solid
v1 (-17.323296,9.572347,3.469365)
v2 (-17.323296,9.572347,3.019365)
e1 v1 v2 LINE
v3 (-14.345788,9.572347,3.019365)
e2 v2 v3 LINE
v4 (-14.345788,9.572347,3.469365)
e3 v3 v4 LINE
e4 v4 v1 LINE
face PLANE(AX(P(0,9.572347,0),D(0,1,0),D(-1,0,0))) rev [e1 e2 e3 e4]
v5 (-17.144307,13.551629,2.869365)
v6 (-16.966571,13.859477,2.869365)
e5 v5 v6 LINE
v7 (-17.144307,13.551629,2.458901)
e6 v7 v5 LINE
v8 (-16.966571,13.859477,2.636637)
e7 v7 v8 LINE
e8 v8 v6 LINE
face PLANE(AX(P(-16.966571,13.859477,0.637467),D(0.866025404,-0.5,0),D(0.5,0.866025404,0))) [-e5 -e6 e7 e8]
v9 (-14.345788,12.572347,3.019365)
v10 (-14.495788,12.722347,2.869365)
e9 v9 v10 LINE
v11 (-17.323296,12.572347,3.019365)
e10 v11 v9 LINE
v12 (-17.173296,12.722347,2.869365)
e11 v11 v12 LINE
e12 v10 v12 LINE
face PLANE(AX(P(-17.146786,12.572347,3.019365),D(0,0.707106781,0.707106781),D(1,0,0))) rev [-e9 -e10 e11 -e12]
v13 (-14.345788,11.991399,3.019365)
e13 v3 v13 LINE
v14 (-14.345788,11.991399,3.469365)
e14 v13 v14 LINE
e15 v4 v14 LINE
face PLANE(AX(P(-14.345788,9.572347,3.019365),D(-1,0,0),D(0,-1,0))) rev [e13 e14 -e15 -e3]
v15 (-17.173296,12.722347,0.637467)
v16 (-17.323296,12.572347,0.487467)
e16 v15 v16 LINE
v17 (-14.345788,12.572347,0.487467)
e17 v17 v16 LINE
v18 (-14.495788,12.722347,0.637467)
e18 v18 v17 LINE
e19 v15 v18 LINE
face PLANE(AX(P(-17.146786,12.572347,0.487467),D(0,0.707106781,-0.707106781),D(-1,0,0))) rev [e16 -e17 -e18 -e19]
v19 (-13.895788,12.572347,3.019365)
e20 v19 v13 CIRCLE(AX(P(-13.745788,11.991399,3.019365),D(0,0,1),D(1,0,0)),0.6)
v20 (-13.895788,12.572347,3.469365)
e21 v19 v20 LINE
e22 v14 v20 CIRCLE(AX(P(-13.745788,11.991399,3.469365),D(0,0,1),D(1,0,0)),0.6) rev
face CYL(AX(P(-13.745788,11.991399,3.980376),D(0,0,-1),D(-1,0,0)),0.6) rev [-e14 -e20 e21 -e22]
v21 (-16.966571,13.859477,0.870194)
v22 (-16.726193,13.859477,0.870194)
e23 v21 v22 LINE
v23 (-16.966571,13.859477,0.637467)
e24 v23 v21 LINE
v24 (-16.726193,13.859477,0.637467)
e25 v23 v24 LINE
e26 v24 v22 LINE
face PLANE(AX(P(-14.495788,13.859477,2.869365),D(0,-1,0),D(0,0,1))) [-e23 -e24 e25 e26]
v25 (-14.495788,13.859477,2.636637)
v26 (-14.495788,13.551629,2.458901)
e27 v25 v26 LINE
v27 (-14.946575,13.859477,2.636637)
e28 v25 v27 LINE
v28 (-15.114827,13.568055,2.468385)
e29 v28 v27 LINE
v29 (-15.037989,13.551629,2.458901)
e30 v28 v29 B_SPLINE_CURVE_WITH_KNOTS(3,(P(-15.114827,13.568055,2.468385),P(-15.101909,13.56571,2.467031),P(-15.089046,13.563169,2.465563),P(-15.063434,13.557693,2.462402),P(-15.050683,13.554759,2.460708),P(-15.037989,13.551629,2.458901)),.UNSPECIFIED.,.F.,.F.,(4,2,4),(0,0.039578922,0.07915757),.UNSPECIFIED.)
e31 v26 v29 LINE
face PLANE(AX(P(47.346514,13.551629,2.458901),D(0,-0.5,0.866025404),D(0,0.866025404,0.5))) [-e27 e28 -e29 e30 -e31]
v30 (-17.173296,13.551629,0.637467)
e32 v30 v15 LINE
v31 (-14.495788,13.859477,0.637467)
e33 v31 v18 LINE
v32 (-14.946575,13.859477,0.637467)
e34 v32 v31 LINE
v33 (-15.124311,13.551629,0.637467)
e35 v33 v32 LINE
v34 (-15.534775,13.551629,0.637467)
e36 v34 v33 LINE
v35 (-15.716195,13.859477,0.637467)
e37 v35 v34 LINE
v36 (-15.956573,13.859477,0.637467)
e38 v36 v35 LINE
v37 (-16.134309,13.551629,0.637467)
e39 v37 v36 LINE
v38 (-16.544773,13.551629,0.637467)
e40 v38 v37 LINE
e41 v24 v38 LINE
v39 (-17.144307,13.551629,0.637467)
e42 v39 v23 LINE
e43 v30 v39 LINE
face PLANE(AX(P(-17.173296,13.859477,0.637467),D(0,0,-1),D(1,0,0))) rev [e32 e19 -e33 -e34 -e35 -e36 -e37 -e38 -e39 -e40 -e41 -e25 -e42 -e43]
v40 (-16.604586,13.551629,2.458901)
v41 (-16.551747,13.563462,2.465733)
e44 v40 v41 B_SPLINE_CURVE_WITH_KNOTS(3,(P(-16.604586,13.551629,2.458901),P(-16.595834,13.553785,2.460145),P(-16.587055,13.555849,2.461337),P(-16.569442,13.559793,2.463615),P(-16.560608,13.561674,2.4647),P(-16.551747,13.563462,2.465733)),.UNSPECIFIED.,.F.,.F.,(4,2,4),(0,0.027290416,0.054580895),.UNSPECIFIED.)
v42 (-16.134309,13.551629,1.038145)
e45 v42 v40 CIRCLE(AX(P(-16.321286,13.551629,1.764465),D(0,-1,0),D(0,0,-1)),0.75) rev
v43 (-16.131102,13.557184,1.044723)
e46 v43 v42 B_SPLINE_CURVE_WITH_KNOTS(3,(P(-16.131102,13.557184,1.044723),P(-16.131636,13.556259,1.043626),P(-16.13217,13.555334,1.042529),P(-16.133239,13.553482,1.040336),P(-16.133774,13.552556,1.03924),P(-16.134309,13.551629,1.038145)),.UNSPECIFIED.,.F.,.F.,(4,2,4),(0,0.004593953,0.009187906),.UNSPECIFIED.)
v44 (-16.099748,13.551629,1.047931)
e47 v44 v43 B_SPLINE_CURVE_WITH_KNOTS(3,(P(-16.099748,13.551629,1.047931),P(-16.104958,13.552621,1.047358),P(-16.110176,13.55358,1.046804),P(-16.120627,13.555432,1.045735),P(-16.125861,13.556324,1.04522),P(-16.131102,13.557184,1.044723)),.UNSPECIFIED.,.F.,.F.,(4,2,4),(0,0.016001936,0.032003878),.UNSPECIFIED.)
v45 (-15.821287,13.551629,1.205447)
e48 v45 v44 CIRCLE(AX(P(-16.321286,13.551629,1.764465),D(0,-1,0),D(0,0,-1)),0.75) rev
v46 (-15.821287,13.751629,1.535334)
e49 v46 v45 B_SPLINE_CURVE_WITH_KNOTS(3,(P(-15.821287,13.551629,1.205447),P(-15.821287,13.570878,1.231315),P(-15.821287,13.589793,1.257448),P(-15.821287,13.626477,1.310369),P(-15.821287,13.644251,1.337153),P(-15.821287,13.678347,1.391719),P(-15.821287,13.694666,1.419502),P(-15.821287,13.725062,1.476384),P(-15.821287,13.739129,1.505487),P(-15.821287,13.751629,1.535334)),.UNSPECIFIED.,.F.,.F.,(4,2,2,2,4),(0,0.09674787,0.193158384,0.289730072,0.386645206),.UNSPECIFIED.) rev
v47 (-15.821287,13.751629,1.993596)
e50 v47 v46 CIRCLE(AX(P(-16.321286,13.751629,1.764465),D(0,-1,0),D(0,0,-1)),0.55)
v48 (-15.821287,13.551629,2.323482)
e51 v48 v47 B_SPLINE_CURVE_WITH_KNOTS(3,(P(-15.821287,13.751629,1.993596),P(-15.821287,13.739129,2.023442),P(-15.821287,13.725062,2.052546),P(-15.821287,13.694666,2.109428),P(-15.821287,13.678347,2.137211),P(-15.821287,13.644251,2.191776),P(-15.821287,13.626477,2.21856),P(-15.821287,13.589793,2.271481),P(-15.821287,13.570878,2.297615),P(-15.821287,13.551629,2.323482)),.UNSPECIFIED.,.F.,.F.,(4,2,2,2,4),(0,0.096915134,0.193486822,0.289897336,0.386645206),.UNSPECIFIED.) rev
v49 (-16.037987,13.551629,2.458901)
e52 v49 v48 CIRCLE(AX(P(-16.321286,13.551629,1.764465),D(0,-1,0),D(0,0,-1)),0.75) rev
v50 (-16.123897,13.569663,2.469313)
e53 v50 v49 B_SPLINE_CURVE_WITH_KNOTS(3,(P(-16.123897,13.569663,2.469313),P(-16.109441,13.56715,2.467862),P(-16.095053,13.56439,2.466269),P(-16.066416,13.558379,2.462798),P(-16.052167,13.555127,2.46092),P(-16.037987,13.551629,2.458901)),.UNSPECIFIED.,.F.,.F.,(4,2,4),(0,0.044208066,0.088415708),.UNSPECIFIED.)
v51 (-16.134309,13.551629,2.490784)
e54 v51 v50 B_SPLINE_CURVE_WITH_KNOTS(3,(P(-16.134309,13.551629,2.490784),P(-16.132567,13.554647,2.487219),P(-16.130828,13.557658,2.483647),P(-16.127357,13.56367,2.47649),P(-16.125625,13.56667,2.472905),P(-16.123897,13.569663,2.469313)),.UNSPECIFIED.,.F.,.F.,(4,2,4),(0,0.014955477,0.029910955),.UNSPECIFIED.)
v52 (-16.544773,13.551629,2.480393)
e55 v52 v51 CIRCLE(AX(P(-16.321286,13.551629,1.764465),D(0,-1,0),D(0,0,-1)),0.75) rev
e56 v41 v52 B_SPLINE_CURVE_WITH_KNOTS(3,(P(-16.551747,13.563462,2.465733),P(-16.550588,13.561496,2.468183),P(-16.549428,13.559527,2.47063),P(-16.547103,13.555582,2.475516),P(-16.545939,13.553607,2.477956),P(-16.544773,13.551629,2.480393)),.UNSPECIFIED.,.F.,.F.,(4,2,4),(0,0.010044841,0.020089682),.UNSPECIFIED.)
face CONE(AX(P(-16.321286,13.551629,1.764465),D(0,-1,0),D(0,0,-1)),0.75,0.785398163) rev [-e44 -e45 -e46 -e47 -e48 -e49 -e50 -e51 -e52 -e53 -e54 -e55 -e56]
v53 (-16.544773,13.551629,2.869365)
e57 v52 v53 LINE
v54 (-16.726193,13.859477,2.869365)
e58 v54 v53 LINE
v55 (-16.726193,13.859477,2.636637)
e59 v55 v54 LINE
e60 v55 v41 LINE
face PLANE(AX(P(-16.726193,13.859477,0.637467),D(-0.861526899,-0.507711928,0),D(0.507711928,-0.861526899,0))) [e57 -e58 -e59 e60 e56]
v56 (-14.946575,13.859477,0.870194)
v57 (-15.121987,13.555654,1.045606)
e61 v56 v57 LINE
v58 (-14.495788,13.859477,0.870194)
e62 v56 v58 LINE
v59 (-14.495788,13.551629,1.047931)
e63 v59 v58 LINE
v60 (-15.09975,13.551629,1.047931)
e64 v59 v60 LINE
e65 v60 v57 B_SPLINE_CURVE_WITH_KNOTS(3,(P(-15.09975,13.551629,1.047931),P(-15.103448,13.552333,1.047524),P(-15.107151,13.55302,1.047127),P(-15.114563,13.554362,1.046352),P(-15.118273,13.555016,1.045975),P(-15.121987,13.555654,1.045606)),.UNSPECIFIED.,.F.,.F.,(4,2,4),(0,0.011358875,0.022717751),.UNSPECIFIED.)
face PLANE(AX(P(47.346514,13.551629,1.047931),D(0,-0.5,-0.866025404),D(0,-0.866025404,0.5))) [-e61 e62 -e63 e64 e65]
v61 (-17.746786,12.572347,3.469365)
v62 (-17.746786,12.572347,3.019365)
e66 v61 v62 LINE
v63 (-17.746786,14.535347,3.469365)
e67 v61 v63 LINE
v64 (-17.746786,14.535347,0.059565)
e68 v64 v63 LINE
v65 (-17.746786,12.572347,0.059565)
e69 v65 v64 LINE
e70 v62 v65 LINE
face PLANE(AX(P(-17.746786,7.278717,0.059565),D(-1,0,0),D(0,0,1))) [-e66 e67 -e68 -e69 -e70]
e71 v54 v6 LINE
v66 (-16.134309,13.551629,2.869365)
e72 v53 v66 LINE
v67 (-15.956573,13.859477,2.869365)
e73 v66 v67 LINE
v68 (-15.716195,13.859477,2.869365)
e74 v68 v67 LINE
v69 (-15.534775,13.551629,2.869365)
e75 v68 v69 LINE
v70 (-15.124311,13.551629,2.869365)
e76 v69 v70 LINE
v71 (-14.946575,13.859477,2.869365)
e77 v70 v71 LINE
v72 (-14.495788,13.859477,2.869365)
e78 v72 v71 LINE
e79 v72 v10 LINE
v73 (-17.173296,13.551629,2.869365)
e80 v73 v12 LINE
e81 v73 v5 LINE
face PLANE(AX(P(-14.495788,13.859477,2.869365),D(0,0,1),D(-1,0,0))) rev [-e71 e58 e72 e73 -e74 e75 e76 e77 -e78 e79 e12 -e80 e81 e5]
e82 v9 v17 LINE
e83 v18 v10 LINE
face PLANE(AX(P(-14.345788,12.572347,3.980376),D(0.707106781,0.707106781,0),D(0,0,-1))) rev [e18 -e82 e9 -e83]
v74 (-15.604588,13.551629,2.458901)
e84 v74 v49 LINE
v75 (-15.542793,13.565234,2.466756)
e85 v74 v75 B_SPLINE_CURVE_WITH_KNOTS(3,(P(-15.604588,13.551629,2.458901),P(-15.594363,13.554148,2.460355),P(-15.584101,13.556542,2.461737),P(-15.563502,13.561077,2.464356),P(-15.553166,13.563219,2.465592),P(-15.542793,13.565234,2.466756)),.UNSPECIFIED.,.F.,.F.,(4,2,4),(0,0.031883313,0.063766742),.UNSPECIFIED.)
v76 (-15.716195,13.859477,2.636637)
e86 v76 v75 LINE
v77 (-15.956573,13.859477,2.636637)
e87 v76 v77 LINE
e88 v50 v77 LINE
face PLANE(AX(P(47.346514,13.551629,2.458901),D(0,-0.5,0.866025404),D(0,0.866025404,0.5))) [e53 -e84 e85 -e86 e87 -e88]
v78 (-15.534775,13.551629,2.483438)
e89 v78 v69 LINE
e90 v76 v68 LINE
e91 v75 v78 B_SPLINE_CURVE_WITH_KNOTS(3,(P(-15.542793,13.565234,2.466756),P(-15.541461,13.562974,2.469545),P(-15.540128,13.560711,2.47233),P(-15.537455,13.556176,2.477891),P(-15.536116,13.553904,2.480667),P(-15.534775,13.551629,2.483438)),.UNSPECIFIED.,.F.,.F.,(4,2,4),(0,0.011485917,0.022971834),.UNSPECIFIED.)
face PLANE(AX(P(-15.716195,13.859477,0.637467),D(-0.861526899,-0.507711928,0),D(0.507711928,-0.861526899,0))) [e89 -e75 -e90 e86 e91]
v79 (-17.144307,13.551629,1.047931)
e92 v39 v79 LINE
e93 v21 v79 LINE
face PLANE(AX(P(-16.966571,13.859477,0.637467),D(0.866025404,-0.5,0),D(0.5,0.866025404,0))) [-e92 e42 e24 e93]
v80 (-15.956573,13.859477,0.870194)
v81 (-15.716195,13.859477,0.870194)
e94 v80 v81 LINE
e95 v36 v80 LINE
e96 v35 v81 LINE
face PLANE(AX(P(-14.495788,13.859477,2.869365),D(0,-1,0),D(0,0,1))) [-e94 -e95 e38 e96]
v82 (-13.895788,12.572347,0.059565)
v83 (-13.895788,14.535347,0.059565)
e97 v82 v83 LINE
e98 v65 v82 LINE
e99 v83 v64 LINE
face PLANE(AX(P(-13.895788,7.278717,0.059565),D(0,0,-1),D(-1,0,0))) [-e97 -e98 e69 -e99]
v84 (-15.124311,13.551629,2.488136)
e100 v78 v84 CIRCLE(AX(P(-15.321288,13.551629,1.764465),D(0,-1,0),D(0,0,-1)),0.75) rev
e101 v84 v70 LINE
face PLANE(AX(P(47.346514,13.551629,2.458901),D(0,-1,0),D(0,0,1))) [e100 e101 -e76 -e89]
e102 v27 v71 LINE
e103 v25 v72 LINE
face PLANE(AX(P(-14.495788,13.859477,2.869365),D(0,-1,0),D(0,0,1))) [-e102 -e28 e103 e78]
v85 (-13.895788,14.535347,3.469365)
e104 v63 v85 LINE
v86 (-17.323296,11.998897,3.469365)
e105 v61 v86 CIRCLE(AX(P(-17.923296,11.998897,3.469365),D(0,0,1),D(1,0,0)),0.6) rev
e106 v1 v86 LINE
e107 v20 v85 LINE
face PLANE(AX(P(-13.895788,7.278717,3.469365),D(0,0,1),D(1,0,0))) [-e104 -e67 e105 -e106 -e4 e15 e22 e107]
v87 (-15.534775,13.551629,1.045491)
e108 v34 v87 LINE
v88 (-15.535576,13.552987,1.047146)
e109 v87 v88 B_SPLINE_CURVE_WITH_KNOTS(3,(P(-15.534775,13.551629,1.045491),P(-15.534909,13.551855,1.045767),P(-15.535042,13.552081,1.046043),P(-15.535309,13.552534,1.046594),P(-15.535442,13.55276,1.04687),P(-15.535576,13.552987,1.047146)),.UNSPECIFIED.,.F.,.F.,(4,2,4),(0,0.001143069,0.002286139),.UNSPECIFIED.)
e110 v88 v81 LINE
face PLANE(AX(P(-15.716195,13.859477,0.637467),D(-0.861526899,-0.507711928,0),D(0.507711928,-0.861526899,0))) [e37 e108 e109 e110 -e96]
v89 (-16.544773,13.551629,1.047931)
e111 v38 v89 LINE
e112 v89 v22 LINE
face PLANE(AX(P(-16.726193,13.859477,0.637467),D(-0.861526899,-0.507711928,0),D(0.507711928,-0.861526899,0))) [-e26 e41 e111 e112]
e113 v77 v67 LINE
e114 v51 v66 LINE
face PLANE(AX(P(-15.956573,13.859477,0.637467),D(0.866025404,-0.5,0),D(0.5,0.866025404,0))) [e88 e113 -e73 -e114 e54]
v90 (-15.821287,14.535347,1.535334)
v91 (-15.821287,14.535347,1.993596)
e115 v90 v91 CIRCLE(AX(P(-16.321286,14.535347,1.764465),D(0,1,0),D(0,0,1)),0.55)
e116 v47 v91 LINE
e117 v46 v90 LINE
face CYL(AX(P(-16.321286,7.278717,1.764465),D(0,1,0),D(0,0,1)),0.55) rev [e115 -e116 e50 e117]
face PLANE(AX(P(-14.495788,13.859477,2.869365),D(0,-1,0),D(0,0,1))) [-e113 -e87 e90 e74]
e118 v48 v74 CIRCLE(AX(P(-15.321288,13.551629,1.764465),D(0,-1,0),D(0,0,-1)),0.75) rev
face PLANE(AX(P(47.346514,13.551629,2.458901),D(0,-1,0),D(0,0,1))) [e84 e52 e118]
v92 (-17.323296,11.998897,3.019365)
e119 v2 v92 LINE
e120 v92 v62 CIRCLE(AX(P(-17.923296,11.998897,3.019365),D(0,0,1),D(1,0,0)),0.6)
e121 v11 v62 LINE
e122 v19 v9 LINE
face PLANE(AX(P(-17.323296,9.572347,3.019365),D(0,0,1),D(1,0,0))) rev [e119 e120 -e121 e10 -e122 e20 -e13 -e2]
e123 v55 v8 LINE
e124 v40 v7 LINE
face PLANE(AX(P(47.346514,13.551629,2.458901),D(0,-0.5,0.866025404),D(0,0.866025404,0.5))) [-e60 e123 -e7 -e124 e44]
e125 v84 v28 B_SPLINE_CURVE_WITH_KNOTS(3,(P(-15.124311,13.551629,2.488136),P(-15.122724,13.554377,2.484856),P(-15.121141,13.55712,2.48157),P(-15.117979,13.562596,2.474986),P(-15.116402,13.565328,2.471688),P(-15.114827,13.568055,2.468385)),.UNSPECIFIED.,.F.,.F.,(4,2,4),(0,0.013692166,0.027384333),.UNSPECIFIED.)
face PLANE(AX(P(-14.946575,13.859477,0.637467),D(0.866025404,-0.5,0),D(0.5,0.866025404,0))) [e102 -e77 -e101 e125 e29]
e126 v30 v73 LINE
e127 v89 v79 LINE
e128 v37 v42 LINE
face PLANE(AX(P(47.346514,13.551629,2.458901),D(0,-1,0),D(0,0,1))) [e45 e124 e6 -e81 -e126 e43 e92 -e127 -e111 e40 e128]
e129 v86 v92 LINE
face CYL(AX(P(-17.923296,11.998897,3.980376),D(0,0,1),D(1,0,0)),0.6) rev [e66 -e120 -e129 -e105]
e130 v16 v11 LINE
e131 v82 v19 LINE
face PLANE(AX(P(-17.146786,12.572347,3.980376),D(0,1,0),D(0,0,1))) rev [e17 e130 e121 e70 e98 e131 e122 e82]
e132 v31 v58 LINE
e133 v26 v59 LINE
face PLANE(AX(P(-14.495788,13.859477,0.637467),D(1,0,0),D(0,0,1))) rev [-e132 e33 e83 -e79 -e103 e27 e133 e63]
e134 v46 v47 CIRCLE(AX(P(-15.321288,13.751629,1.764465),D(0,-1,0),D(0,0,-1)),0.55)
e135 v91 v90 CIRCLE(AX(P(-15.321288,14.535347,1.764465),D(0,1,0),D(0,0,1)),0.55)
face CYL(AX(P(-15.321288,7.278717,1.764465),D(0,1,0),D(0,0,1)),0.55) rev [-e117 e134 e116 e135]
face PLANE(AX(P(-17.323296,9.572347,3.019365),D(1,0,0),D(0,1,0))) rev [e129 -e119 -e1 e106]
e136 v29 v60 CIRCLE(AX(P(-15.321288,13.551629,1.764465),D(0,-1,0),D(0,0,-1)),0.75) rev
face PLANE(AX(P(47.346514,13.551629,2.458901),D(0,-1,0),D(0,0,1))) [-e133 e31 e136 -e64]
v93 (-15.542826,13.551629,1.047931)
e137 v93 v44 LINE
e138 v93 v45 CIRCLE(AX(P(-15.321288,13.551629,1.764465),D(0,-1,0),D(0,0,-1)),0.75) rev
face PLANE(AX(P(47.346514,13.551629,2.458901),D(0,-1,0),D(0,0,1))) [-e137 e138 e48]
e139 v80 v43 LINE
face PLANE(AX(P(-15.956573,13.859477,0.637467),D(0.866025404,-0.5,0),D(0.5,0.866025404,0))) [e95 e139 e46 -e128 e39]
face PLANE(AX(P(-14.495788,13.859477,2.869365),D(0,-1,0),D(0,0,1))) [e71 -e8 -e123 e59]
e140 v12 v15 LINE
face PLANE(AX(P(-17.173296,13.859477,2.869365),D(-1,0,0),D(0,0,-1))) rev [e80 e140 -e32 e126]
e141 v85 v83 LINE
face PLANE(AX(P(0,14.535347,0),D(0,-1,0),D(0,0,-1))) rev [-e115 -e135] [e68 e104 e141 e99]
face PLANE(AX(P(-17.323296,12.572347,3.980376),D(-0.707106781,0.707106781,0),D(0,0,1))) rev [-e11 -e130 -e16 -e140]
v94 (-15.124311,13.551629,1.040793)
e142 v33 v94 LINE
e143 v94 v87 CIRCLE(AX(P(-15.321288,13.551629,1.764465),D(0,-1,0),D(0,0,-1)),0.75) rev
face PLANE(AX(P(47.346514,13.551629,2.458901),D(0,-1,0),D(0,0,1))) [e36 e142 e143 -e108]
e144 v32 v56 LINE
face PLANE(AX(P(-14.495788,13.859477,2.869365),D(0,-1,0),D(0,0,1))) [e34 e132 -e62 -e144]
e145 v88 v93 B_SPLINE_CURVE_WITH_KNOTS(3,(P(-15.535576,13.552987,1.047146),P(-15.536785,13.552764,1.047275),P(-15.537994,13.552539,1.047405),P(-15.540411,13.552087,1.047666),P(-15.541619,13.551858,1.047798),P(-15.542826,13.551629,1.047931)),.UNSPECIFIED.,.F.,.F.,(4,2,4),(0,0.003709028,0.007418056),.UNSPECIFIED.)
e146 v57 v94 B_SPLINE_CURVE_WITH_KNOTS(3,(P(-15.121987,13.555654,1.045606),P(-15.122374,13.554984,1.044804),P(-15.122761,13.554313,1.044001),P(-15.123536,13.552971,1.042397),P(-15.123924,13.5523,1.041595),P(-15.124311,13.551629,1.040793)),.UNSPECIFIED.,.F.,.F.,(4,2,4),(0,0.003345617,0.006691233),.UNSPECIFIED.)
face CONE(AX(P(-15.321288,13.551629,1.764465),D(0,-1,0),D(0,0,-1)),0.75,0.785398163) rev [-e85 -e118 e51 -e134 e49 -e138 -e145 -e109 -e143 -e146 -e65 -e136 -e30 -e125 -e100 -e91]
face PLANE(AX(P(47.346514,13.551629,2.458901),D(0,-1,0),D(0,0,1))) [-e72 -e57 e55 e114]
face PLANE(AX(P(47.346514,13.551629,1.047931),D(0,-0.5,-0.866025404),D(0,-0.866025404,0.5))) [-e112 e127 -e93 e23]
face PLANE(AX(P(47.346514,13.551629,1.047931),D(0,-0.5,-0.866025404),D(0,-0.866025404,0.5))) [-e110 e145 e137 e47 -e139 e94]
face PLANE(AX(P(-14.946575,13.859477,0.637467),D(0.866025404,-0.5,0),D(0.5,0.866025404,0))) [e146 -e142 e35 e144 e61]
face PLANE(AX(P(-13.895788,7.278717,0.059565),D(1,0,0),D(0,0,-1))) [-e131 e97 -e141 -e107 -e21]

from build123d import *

# Parameters (mm, degrees)
BOSS_EXTRUDE1_DEPTH      = 0.7
BOSS_EXTRUDE1_DEPTH_BACK = 1.263
SKETCH1_W                = 3.850998
SKETCH1_H                = 3.4098
CAVITY1_START            = 0.637466597
CAVITY1_OUTLINE_W        = 2.67750798
CAVITY1_OUTLINE_H        = 0.979282
CAVITY1_DEPTH            = 2.231898
CAVITY1_2_DEPTH          = 0.410464
CAVITY1_START_2          = 2.458900597
CAVITY1_3_DEPTH          = 0.410464
CAVITY1_START_3          = -17.14430724
CAVITY1_4_DEPTH          = 2.648519043
CHAMFER1_SIZE            = 0.2
CHAMFER2_SIZE            = 0.15
SKETCH2_W                = 2.97750798
SKETCH2_H                = 0.45
BOSS_EXTRUDE2_DEPTH      = 3
FILLET1_R                = 0.6


with BuildPart() as part:
    # Sketch1 → Boss-Extrude1 (new, two sides: drawn at the far end of the back side and taken through both)
    with BuildSketch(Plane(origin=(0, 13.835346538, 0), x_dir=(1, 0, 0), z_dir=(0, 1, 0)).offset(-BOSS_EXTRUDE1_DEPTH_BACK)):
        with Locations((-15.821287197, -1.764464597)):
            Rectangle(SKETCH1_W, SKETCH1_H)
        with BuildLine():
            ThreePointArc((-15.821287197, -1.53533363), (-16.871286197, -1.764464597), (-15.821287197, -1.993595564))
            ThreePointArc((-15.821287197, -1.993595564), (-14.771288197, -1.764464597), (-15.821287197, -1.53533363))
        make_face(mode=Mode.SUBTRACT)
    extrude(amount=BOSS_EXTRUDE1_DEPTH + BOSS_EXTRUDE1_DEPTH_BACK)

    # Cavity1: read off the stored shape, not the designer's step
    # Cavity1 outline → Cavity1 (cut)
    with BuildSketch(Plane.XY.offset(CAVITY1_START)):
        with Locations((-15.834542187, 13.061987538)):
            Rectangle(CAVITY1_OUTLINE_W, CAVITY1_OUTLINE_H)
    extrude(amount=CAVITY1_DEPTH, mode=Mode.SUBTRACT)

    # Cavity1 2 outline → Cavity1 2 (cut)
    with BuildSketch(Plane.XY.offset(CAVITY1_START)):
        Polygon((-16.966571114, 13.859476538), (-17.14430724, 13.551628538), (-16.54477326, 13.551628538), (-16.726193134, 13.859476538), align=None)
        Polygon((-15.956573134, 13.859476538), (-16.13430926, 13.551628538), (-15.53477528, 13.551628538), (-15.716195154, 13.859476538), align=None)
        Polygon((-15.12431128, 13.551628538), (-14.495788197, 13.551628538), (-14.495788197, 13.859476538), (-14.946575154, 13.859476538), align=None)
    extrude(amount=CAVITY1_2_DEPTH, mode=Mode.SUBTRACT)

    # Cavity1 3 outline → Cavity1 3 (cut)
    with BuildSketch(Plane.XY.offset(CAVITY1_START_2)):
        Polygon((-16.966571114, 13.859476538), (-17.14430724, 13.551628538), (-16.54477326, 13.551628538), (-16.726193134, 13.859476538), align=None)
        Polygon((-15.956573134, 13.859476538), (-16.13430926, 13.551628538), (-15.53477528, 13.551628538), (-15.716195154, 13.859476538), align=None)
        Polygon((-15.12431128, 13.551628538), (-14.495788197, 13.551628538), (-14.495788197, 13.859476538), (-14.946575154, 13.859476538), align=None)
    extrude(amount=CAVITY1_3_DEPTH, mode=Mode.SUBTRACT)

    # Cavity1 4 outline → Cavity1 4 (add)
    with BuildSketch(Plane.YZ.offset(CAVITY1_START_3)):
        Polygon((13.859476538, 2.458900597), (13.859476538, 2.636636723), (13.551628538, 2.458900597), align=None)
        Polygon((13.859476538, 1.047930597), (13.551628538, 1.047930597), (13.859476538, 0.870194471), align=None)
    extrude(amount=CAVITY1_4_DEPTH)

    # Chamfer1
    # the kernel refuses this chamfer: 0.2 mm, written as the material it takes off along each edge
    with BuildSketch(Plane(origin=(-15.321288197, 13.551628538, 1.764464597), x_dir=(-0.9999950652018582, 0, -0.0031415874858801893), z_dir=(-0.0031415874858801893, 0, 0.9999950652018582))) as chamfer1_piece_1:
        Polygon((0.55, -CHAMFER1_SIZE), (0.55 + CHAMFER1_SIZE, 0), (0.55, 0), align=None)
    revolve(axis=Axis((-15.321288197, 13.551628538, 1.764464597), (0, -1, 0)), revolution_arc=359.64, mode=Mode.SUBTRACT)
    with BuildSketch(Plane(origin=(-16.321286197, 13.551628538, 1.764464597), x_dir=(0.9999950652018582, 0, 0.003141587485879382), z_dir=(0.003141587485879382, 0, -0.9999950652018582))) as chamfer1_piece_2:
        Polygon((0.55, -CHAMFER1_SIZE), (0.55 + CHAMFER1_SIZE, 0), (0.55, 0), align=None)
    revolve(axis=Axis((-16.321286197, 13.551628538, 1.764464597), (0, -1, 0)), revolution_arc=359.64, mode=Mode.SUBTRACT)

    # Chamfer2
    chamfer2_edges = [part.edges().sort_by_distance(p)[0] for p in [
        (-15.834542187, 12.572346538, 2.869364597),
        (-17.173296177, 12.572346538, 1.753415597),
        (-15.834542187, 12.572346538, 0.637466597),
        (-14.495788197, 12.572346538, 1.753415597),
    ]]
    chamfer(chamfer2_edges, length=CHAMFER2_SIZE)

    # Sketch2 → Boss-Extrude2 (add)
    with BuildSketch(Plane.XZ.offset(-12.572346538)):
        with Locations((-15.834542187, 3.244364597)):
            Rectangle(SKETCH2_W, SKETCH2_H)
    extrude(amount=BOSS_EXTRUDE2_DEPTH)

    # Fillet1
    # the kernel refuses this fillet: 0.6 mm, written as the material it adds along each edge
    with BuildSketch(Plane(origin=(-14.345788197, 12.572346538, 3.019364597), x_dir=(1, 0, 0), z_dir=(0, 0, 1))) as fillet1_piece_1:
        with BuildLine():
            CenterArc((0.6, -0.580947502), FILLET1_R, 104.477512186, 75.522487814)
            Line((0, -0.580947502), (0, 0))
            Line((0, 0), (0.45, 0))
        make_face()
    extrude(amount=0.45)
    with BuildSketch(Plane(origin=(-17.323296177, 12.572346538, 3.469364597), x_dir=(-1, 0, 0), z_dir=(0, 0, -1))) as fillet1_piece_2:
        with BuildLine():
            CenterArc((0.6, -0.573449411), FILLET1_R, 107.108570934, 72.891429066)
            Line((0, -0.573449411), (0, 0))
            Line((0, 0), (0.42349002, 0))
        make_face()
    extrude(amount=0.45)


solid = part.part
